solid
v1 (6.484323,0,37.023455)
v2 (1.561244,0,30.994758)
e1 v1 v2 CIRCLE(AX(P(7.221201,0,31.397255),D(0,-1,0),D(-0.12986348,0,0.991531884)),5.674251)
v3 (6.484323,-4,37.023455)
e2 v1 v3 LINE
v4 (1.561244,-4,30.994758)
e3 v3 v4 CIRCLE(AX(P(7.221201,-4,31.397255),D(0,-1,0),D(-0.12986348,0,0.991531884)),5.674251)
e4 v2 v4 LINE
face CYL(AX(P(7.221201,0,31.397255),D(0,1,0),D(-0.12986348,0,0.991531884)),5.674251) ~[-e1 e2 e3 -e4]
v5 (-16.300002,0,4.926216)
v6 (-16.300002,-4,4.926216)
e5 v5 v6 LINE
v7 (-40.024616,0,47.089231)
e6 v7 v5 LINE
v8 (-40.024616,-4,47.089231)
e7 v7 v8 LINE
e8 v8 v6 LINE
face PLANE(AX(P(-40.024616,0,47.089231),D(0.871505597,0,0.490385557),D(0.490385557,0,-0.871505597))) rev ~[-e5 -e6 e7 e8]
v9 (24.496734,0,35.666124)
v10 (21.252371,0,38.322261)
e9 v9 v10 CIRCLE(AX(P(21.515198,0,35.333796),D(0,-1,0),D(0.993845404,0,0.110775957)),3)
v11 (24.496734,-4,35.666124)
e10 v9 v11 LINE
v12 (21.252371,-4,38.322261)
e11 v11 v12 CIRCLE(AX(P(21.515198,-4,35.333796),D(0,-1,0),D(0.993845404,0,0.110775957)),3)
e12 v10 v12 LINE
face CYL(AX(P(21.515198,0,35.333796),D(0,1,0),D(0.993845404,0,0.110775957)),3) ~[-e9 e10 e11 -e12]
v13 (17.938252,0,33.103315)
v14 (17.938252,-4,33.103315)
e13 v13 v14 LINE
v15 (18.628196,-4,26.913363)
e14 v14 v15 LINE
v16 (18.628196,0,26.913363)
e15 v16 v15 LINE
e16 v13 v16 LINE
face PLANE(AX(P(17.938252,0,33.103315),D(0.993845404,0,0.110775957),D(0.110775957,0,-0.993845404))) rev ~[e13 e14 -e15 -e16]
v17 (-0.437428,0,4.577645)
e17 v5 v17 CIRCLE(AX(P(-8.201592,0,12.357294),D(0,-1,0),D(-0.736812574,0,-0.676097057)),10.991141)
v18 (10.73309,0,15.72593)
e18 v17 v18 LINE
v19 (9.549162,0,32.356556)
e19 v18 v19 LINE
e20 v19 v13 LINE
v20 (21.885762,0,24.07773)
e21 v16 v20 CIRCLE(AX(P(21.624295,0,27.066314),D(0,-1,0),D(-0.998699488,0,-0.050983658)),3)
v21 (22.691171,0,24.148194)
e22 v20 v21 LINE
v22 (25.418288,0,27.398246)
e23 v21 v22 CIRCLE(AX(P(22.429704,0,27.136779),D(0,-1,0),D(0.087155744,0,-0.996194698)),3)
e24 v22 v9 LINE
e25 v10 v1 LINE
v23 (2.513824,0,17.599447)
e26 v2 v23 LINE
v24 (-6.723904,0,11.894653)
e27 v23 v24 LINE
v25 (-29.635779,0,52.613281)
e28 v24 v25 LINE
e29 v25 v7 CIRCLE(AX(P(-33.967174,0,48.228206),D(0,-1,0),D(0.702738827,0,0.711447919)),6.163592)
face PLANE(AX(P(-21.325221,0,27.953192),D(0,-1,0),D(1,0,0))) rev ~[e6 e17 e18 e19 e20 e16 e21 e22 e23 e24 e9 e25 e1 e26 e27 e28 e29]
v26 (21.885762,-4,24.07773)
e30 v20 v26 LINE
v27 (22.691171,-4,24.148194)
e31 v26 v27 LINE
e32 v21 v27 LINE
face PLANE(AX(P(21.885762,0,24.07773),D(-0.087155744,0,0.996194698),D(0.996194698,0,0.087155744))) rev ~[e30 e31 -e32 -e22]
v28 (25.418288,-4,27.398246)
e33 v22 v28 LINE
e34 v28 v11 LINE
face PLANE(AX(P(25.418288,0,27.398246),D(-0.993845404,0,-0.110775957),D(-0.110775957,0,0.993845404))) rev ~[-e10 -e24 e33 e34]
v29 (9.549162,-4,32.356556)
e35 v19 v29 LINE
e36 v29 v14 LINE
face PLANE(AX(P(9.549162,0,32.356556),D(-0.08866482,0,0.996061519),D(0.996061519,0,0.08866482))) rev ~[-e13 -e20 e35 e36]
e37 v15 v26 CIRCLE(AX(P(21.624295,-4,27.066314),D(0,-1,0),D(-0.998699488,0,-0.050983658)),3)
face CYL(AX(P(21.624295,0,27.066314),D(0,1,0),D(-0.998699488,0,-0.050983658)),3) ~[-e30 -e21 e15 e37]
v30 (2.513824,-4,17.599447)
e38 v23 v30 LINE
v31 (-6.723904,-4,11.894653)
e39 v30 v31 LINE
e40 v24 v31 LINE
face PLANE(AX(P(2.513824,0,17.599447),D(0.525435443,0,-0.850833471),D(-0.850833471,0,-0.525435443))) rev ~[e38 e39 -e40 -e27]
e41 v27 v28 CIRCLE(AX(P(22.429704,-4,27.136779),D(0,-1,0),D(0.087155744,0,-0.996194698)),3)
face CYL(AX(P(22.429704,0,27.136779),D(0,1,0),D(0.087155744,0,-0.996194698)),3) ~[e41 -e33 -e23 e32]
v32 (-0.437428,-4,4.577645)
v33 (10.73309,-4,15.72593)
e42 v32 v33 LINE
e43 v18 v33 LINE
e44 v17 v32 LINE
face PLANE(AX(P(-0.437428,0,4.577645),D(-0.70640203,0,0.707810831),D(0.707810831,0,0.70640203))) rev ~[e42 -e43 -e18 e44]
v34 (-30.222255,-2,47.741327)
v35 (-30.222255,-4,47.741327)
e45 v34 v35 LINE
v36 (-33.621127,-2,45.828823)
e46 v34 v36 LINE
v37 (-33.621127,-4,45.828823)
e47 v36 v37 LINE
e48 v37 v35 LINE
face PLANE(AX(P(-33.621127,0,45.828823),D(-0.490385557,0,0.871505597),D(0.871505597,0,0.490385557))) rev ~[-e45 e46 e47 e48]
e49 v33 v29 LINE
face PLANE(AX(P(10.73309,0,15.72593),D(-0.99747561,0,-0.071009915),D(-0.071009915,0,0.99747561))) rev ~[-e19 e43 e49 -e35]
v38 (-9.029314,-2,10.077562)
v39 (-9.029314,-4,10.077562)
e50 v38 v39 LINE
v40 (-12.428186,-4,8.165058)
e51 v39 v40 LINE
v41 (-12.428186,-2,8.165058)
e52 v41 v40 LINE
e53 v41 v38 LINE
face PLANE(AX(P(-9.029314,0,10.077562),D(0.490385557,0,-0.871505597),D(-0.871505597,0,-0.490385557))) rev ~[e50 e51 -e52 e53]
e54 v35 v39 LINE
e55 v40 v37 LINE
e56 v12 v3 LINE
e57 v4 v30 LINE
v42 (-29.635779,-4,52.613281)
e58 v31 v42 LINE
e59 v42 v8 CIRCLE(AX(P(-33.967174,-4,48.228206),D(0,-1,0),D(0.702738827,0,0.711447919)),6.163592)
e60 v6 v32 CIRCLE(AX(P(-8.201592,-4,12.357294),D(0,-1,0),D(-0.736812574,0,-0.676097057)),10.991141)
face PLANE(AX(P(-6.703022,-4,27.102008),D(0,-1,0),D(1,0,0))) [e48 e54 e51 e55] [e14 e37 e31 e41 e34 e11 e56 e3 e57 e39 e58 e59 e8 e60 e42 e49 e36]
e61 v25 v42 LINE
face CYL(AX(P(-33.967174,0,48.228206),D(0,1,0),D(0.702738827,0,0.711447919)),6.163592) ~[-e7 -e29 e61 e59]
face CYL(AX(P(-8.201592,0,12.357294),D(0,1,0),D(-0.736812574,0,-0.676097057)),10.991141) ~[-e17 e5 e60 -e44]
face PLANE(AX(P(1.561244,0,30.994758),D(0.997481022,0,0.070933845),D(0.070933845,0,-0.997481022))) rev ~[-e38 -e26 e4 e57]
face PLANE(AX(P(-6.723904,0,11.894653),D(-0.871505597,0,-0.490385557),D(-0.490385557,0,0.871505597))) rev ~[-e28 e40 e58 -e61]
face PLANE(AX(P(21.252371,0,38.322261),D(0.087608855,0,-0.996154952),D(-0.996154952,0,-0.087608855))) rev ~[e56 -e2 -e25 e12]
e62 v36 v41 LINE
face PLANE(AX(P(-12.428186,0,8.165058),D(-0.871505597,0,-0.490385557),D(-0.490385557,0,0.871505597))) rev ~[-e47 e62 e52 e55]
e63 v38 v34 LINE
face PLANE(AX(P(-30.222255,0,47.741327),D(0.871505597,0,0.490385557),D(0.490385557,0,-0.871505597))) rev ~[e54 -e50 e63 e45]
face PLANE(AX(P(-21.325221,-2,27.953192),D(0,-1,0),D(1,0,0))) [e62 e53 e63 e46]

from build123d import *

# Parameters (mm, degrees)
F1_DEPTH = 4
F2_DEPTH = 2


# Not quite as in the source:
# - a feature names something its author has since deleted; it is built from what else it names


with BuildPart() as f1:
    # F0 (on Front) → F1 (new body)
    with BuildSketch(Plane.XZ):
        with BuildLine():
            Line((21.8857619278, 24.0777302796), (22.6911712955, 24.1481944696))
            ThreePointArc((22.6911712955, 24.1481944696), (24.7278373945, 25.2084157357), (25.4182881585, 27.3982457918))
            Line((25.4182881585, 27.3982457918), (24.4967342397, 35.6661240294))
            ThreePointArc((24.4967342397, 35.6661240294), (23.4156220476, 37.6550864329), (21.2523714627, 38.3222610136))
            Line((21.2523714627, 38.3222610136), (6.4843232999, 37.0234552548))
            ThreePointArc((6.4843232999, 37.0234552548), (2.8261843885, 34.9862585866), (1.5612437018, 30.9947581645))
            Line((1.5612437018, 30.9947581645), (2.5138241495, 17.5994470493))
            Line((2.5138241495, 17.5994470493), (-6.7239039322, 11.8946529702))
            Line((-6.7239039322, 11.8946529702), (-29.6357786399, 52.6132809116))
            ThreePointArc((-29.6357786399, 52.6132809116), (-36.8608896735, 53.670290075), (-40.0246161044, 47.0892314299))
            Line((-40.0246161044, 47.0892314299), (-16.300002113, 4.9262158573))
            ThreePointArc((-16.300002113, 4.9262158573), (-8.4430569993, 1.3688058119), (-0.4374276181, 4.5776453154))
            Line((-0.4374276181, 4.5776453154), (10.7330901066, 15.7259296403))
            Line((10.7330901066, 15.7259296403), (9.5491620303, 32.356556315))
            Line((9.5491620303, 32.356556315), (17.93825214, 33.1033145689))
            Line((17.93825214, 33.1033145689), (18.6281962336, 26.9133634004))
            ThreePointArc((18.6281962336, 26.9133634004), (19.654585126, 24.8035187117), (21.8857619278, 24.0777302796))
        make_face()
        Polygon((-9.0293143542, 10.0775616021), (-12.4281861821, 8.1650579296), (-33.6211269399, 45.8288231449), (-30.2222551107, 47.741326818), align=None, mode=Mode.SUBTRACT)
    extrude(amount=F1_DEPTH)

    # F0 (on Front) → F2 (join)
    with BuildSketch(Plane.XZ):
        Polygon((-33.6211269399, 45.8288231449), (-12.4281861821, 8.1650579296), (-9.0293143542, 10.0775616021), (-30.2222551107, 47.741326818), align=None)
    extrude(amount=F2_DEPTH)


solid = f1.part
